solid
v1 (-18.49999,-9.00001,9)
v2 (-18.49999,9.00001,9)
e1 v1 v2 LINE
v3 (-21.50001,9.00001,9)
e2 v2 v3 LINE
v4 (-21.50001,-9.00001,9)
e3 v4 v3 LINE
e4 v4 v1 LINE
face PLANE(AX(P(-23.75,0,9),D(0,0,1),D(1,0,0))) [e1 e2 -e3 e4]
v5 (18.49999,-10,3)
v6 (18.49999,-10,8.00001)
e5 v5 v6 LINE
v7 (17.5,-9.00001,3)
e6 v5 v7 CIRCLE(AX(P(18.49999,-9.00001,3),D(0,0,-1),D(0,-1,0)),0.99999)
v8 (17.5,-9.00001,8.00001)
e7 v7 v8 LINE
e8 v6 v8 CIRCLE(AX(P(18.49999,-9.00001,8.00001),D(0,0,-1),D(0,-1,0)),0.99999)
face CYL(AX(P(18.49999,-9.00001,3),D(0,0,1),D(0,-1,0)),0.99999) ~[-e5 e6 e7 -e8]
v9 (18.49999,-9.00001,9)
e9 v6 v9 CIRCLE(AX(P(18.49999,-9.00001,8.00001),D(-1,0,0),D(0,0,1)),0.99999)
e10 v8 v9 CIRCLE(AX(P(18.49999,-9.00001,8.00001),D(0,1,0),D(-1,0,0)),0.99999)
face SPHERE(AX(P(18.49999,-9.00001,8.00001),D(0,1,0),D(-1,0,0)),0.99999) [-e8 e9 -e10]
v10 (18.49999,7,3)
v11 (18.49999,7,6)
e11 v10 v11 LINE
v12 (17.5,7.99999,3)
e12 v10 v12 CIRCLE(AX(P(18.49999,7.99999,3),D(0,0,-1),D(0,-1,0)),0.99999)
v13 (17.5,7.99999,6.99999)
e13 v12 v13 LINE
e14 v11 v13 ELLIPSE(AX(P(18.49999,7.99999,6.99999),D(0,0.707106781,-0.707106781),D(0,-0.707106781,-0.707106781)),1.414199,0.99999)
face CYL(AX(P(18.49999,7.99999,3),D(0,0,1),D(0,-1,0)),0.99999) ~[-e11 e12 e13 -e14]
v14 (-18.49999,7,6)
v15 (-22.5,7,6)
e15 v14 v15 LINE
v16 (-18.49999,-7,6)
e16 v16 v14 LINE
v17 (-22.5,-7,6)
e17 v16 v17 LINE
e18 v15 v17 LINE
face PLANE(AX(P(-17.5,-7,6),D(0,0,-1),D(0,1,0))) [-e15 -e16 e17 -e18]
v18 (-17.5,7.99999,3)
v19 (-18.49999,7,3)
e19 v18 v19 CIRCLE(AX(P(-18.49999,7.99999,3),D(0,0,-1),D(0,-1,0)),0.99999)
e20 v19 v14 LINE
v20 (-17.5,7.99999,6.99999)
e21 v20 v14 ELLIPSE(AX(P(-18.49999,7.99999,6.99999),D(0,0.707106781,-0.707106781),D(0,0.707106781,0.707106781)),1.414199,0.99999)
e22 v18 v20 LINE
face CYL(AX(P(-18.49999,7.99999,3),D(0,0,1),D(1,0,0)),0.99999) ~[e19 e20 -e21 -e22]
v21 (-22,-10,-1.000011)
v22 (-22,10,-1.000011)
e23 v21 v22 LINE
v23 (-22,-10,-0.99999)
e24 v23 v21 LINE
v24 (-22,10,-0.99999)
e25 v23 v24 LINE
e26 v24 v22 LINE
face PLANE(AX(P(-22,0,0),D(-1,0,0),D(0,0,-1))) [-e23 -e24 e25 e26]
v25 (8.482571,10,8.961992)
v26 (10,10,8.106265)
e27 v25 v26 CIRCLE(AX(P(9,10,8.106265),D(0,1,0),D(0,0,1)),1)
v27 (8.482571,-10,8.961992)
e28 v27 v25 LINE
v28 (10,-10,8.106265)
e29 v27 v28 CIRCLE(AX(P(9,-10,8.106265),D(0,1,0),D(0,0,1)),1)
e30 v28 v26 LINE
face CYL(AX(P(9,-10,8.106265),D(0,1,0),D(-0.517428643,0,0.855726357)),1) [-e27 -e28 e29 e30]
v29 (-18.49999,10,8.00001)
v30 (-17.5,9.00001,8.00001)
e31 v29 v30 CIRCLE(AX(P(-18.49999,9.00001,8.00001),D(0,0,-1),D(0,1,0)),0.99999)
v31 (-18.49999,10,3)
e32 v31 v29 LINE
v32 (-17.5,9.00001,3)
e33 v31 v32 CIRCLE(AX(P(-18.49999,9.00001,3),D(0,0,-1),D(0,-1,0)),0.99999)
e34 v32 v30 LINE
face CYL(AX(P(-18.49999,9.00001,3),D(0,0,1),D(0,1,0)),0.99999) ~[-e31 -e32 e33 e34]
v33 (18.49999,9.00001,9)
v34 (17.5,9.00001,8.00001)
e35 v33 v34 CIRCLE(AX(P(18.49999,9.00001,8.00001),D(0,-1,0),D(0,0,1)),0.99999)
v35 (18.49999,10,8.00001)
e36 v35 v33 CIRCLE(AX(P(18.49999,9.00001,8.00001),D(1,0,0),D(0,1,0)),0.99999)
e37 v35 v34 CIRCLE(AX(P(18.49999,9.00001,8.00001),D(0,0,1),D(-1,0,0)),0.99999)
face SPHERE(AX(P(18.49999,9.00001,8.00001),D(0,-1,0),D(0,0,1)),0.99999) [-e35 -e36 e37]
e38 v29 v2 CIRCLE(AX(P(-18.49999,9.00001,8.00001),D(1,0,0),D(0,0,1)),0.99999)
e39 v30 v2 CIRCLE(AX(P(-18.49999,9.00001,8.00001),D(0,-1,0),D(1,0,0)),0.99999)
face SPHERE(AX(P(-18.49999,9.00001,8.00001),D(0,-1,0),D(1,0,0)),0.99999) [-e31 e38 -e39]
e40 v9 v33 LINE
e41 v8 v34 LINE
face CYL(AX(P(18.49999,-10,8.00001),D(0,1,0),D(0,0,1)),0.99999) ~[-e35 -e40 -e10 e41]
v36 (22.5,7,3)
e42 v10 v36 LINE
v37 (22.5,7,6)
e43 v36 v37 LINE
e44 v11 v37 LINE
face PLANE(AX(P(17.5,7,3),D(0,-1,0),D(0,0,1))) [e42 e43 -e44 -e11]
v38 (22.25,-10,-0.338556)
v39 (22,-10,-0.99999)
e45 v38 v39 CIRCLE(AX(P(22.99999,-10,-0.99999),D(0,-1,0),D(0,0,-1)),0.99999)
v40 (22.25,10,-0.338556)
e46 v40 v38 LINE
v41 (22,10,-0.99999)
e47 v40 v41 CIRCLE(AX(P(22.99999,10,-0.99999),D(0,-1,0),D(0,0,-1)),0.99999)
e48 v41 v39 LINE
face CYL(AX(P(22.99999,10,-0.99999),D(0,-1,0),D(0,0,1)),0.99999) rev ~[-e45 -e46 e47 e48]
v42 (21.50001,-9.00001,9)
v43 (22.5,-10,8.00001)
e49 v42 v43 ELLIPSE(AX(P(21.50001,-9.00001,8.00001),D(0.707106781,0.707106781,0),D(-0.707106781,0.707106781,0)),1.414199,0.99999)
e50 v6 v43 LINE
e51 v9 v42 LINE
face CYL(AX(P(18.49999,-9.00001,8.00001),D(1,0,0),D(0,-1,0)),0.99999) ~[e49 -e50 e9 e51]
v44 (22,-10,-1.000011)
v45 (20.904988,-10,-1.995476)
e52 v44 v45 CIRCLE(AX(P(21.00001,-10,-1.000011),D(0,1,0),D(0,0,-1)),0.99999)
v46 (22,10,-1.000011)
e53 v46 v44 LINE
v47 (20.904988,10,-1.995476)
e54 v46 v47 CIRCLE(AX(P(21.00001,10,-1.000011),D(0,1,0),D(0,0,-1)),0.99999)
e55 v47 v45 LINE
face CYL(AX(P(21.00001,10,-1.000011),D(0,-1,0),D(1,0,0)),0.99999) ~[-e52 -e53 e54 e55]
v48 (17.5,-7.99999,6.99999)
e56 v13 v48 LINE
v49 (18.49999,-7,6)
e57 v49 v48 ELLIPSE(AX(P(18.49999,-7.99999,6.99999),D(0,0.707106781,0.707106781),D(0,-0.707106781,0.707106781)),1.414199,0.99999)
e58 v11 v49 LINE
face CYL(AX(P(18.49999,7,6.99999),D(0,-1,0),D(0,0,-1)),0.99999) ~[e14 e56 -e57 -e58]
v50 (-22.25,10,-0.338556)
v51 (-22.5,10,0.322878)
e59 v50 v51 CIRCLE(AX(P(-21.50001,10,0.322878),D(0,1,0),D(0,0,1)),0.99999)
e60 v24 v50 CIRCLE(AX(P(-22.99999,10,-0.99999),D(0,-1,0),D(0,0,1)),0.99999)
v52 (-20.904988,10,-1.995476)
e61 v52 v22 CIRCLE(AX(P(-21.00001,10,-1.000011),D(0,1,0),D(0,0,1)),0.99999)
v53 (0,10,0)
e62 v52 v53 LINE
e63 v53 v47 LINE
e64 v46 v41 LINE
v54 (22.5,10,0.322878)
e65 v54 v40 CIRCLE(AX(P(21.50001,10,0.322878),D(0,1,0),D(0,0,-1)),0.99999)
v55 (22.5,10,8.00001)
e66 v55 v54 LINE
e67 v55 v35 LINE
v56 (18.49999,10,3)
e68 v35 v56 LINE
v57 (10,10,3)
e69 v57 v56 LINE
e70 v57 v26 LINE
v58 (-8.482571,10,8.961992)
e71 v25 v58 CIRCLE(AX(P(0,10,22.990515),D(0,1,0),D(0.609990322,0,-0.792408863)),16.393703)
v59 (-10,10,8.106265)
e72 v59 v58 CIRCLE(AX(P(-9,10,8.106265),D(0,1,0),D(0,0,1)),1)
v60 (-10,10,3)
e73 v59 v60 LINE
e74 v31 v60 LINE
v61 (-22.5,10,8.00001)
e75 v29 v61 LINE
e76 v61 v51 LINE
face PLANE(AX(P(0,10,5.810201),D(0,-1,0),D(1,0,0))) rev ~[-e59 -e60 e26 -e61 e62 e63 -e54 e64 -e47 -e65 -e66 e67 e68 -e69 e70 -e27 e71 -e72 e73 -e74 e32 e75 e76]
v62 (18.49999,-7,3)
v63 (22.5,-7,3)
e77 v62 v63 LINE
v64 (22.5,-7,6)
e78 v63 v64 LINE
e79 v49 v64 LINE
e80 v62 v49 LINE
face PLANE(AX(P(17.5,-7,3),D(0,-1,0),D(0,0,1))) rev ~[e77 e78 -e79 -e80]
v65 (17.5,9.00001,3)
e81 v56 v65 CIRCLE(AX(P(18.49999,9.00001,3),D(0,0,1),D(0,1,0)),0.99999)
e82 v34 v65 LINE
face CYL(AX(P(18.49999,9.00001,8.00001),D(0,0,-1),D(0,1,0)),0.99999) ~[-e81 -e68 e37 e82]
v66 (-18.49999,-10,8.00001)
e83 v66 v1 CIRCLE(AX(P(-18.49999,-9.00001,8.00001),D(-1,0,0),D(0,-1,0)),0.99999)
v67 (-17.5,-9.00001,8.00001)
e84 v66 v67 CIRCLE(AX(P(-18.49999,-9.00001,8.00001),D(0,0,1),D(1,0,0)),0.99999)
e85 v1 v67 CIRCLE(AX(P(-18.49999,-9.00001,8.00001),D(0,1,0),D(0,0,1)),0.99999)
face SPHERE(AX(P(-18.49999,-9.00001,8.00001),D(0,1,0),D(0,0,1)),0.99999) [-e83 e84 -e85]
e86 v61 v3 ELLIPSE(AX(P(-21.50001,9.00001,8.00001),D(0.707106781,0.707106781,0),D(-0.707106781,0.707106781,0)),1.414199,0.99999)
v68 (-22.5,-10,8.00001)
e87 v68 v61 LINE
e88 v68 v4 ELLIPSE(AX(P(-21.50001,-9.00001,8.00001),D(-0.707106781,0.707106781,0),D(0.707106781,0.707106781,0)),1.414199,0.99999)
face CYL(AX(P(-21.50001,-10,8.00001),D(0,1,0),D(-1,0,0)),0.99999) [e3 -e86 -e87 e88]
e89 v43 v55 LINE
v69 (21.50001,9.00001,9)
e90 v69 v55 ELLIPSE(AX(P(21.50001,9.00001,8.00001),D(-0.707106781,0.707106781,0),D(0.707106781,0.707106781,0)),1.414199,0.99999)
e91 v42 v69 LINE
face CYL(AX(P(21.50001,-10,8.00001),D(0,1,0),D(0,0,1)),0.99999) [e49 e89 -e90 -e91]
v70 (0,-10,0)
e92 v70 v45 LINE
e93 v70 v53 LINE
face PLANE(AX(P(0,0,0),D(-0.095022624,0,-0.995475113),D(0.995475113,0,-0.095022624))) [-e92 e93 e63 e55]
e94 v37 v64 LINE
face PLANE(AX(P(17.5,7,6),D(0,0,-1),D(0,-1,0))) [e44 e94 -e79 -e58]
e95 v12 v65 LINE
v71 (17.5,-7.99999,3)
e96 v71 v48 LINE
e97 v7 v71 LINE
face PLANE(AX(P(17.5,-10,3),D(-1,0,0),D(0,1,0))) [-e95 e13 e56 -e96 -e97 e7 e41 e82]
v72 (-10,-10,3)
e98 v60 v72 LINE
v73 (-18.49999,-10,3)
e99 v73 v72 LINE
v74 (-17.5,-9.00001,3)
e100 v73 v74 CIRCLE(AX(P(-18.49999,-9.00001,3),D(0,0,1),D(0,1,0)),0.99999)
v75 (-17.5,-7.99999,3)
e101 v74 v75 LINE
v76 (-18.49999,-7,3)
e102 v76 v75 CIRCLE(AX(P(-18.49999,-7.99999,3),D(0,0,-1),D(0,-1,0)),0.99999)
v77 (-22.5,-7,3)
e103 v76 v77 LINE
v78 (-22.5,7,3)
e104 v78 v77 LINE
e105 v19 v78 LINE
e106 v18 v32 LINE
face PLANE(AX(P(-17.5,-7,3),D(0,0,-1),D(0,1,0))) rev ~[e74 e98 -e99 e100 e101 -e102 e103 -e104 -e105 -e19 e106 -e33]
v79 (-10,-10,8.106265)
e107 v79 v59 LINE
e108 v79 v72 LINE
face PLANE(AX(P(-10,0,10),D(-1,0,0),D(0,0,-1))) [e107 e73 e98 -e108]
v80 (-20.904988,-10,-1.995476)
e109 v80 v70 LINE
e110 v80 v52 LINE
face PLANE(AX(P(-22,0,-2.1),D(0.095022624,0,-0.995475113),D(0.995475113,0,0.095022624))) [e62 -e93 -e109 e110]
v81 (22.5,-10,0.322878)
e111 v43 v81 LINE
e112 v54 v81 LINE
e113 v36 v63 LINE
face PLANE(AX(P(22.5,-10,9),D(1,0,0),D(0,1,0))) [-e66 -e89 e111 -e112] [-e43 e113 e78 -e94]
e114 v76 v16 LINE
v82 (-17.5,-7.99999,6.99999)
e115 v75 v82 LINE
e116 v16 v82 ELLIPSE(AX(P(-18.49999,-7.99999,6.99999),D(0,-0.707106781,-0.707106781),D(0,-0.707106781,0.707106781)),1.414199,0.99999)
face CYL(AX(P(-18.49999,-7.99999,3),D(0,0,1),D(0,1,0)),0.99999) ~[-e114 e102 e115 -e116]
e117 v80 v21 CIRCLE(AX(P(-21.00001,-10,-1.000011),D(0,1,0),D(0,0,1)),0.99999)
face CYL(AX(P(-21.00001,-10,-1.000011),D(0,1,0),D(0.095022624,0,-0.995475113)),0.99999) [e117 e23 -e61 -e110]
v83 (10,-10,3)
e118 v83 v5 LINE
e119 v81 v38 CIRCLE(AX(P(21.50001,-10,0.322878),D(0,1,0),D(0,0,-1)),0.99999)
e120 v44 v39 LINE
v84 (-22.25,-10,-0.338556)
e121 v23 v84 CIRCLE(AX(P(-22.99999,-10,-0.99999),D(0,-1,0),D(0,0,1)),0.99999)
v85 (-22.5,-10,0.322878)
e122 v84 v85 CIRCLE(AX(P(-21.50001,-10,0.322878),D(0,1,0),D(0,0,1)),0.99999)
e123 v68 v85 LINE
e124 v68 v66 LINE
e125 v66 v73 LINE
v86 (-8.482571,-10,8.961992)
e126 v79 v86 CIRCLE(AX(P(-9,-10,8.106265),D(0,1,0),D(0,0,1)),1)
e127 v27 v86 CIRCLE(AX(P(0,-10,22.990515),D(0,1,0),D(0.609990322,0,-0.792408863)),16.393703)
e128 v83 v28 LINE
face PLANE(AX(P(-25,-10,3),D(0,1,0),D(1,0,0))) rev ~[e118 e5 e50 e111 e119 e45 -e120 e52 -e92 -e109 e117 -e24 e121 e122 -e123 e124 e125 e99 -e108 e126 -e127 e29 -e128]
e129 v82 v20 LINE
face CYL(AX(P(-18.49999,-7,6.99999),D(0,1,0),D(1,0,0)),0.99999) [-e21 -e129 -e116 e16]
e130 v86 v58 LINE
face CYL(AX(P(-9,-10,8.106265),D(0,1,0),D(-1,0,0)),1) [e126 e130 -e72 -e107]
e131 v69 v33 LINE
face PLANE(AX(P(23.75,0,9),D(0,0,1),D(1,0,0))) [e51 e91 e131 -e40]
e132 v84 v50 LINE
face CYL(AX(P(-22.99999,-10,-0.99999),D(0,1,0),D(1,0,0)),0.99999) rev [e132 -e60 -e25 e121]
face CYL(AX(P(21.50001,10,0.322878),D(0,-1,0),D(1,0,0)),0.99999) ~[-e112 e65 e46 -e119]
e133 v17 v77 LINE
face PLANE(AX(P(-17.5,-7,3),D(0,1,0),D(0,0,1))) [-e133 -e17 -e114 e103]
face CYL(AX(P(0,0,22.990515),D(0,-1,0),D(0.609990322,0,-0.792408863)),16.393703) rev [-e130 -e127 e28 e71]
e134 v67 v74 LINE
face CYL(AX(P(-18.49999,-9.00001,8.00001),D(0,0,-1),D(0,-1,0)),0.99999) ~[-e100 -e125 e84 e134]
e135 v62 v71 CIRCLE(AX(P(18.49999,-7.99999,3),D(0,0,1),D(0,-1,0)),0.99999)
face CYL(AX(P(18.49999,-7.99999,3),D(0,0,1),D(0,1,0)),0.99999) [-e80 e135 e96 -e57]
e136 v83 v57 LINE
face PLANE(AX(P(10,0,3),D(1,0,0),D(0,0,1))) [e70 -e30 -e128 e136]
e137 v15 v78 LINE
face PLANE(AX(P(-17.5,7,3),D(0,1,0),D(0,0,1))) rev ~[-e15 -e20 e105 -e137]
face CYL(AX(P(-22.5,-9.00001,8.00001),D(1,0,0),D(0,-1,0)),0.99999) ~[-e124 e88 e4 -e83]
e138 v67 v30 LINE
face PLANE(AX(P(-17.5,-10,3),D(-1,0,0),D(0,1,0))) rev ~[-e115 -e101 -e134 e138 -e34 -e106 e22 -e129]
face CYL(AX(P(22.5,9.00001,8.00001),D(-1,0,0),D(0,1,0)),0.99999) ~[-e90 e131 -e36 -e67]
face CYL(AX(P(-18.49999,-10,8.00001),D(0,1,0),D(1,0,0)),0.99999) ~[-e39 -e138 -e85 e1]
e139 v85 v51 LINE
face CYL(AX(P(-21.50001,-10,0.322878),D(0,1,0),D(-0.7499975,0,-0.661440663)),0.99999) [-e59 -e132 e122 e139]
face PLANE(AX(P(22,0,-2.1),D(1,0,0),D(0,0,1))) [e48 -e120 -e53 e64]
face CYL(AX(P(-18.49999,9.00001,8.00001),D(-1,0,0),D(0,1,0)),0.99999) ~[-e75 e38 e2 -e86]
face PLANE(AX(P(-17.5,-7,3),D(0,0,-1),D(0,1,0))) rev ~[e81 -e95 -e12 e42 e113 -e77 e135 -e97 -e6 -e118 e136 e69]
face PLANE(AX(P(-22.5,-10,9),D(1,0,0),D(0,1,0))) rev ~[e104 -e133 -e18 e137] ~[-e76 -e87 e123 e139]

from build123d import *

# Parameters (mm, degrees)
F0_W      = 50
F0_H      = 20
F1_DEPTH  = 3
F3_DEPTH  = 10
F4_DEPTH  = 10
F5_W      = 2.5
F5_H      = 20
F5_W_2    = 5
F6_DEPTH  = 6
F7_W      = 14
F7_H      = 3
F8_DEPTH  = 25
F9_W      = 14
F9_H      = 3
F10_DEPTH = 25
F12_DEPTH = 10
F13_DEPTH = 10
F14_R     = 0.99999
F15_R     = 1
F16_W     = 2.5
F16_H     = 20
F17_DEPTH = 25
F18_W     = 2.5
F18_H     = 20
F19_DEPTH = 25
F20_R     = 0.99999


# Not quite as in the source:
# - a fillet or chamfer is up to 0.001 mm smaller than in the source, because OpenCascade refuses the exact size


with BuildPart() as f1:
    # F0 (on Top) → F1 (new body)
    with BuildSketch(Plane.XY):
        Rectangle(F0_W, F0_H)
    extrude(amount=F1_DEPTH)

    # F2 (on Front) → F3 (join)
    with BuildSketch(Plane.XZ):
        Polygon((0, 0), (-22, 0), (-22, -2.1), align=None)
        Polygon((22, 0), (0, 0), (22, -2.1), align=None)
    extrude(amount=F3_DEPTH)

    # F4 (add): faces of the model
    f4_faces = [f1.faces().sort_by_distance(p)[0] for p in [
        (14.6666666667, 0, -0.7),
        (-14.6666666667, 0, -0.7),
    ]]
    extrude(f4_faces, amount=F4_DEPTH)

    # F5 (on face) → F6 (join)
    with BuildSketch(Plane.XY.offset(3)):
        with Locations((-23.75, 0)):
            Rectangle(F5_W, F5_H)
        with Locations((-20, 0)):
            Rectangle(F5_W_2, F5_H)
        with Locations((23.75, 0)):
            Rectangle(F5_W, F5_H)
        with Locations((20, 0)):
            Rectangle(F5_W_2, F5_H)
    extrude(amount=F6_DEPTH)

    # F7 (on face) → F8 (cut)
    with BuildSketch(Plane.YZ.offset(-17.5)):
        with Locations((0, 4.5)):
            Rectangle(F7_W, F7_H)
    extrude(amount=-F8_DEPTH, mode=Mode.SUBTRACT)

    # F9 (on face) → F10 (cut)
    with BuildSketch(Plane(origin=(17.5, 0, 0), x_dir=(0, -1, 0), z_dir=(-1, 0, 0))):
        with Locations((0, 4.5)):
            Rectangle(F9_W, F9_H)
    extrude(amount=-F10_DEPTH, mode=Mode.SUBTRACT)

    # F11 (on Front) → F12 (join)
    with BuildSketch(Plane.XZ):
        with BuildLine():
            Line((-10, 10), (-10, 3))
            Line((-10, 3), (10, 3))
            Line((10, 3), (10, 10))
            ThreePointArc((10, 10), (0, 6.5968126209), (-10, 10))
        make_face()
    extrude(amount=F12_DEPTH)

    # F13 (add): a face of the model
    f13_faces = [f1.faces().sort_by_distance(p)[0] for p in [
        (0, 0, 5.4458216504),
    ]]
    extrude(f13_faces, amount=F13_DEPTH)

    # F14 (radius 1 in the source; OpenCascade refuses exactly that, so slightly less here)
    f14_edges = [f1.edges().sort_by_distance(p)[0] for p in [
        (-17.5, 0, 9),
        (-25, 0, 0),
        (-22, 0, 0),
        (-22, 0, -2.1),
        (25, 0, 0),
        (22, 0, 0),
        (22, 0, -2.1),
        (17.5, 0, 9),
        (17.5, 0, 6),
        (25, 0, 6),
        (25, -7, 4.5),
        (17.5, -7, 4.5),
        (25, 7, 4.5),
        (17.5, 7, 4.5),
        (25, 0, 3),
        (-25, 0, 6),
        (-17.5, -7, 4.5),
        (-25, -7, 4.5),
        (-25, 0, 3),
        (-17.5, 0, 6),
        (-17.5, 7, 4.5),
    ]]
    fillet(f14_edges, radius=F14_R)

    # F15
    f15_edges = [f1.edges().sort_by_distance(p)[0] for p in [
        (-10, 0, 10),
        (10, 0, 10),
    ]]
    fillet(f15_edges, radius=F15_R)

    # F16 (on face) → F17 (cut)
    with BuildSketch(Plane.XY.offset(9)):
        with Locations((-23.75, 0)):
            Rectangle(F16_W, F16_H)
    extrude(amount=-F17_DEPTH, mode=Mode.SUBTRACT)

    # F18 (on face) → F19 (cut)
    with BuildSketch(Plane.XY.offset(9)):
        with Locations((23.75, 0)):
            Rectangle(F18_W, F18_H)
    extrude(amount=-F19_DEPTH, mode=Mode.SUBTRACT)

    # F20 (radius 1 in the source; OpenCascade refuses exactly that, so slightly less here)
    f20_edges = [f1.edges().sort_by_distance(p)[0] for p in [
        (-22.5, 0, -0.13397),
        (22.5, 0, -0.13397),
        (22.5, 0, 9),
        (20.499995, -10, 9),
        (20.499995, 10, 9),
        (-20.499995, 10, 9),
        (-22.5, 0, 9),
        (-20.499995, -10, 9),
    ]]
    fillet(f20_edges, radius=F20_R)


solid = f1.part
